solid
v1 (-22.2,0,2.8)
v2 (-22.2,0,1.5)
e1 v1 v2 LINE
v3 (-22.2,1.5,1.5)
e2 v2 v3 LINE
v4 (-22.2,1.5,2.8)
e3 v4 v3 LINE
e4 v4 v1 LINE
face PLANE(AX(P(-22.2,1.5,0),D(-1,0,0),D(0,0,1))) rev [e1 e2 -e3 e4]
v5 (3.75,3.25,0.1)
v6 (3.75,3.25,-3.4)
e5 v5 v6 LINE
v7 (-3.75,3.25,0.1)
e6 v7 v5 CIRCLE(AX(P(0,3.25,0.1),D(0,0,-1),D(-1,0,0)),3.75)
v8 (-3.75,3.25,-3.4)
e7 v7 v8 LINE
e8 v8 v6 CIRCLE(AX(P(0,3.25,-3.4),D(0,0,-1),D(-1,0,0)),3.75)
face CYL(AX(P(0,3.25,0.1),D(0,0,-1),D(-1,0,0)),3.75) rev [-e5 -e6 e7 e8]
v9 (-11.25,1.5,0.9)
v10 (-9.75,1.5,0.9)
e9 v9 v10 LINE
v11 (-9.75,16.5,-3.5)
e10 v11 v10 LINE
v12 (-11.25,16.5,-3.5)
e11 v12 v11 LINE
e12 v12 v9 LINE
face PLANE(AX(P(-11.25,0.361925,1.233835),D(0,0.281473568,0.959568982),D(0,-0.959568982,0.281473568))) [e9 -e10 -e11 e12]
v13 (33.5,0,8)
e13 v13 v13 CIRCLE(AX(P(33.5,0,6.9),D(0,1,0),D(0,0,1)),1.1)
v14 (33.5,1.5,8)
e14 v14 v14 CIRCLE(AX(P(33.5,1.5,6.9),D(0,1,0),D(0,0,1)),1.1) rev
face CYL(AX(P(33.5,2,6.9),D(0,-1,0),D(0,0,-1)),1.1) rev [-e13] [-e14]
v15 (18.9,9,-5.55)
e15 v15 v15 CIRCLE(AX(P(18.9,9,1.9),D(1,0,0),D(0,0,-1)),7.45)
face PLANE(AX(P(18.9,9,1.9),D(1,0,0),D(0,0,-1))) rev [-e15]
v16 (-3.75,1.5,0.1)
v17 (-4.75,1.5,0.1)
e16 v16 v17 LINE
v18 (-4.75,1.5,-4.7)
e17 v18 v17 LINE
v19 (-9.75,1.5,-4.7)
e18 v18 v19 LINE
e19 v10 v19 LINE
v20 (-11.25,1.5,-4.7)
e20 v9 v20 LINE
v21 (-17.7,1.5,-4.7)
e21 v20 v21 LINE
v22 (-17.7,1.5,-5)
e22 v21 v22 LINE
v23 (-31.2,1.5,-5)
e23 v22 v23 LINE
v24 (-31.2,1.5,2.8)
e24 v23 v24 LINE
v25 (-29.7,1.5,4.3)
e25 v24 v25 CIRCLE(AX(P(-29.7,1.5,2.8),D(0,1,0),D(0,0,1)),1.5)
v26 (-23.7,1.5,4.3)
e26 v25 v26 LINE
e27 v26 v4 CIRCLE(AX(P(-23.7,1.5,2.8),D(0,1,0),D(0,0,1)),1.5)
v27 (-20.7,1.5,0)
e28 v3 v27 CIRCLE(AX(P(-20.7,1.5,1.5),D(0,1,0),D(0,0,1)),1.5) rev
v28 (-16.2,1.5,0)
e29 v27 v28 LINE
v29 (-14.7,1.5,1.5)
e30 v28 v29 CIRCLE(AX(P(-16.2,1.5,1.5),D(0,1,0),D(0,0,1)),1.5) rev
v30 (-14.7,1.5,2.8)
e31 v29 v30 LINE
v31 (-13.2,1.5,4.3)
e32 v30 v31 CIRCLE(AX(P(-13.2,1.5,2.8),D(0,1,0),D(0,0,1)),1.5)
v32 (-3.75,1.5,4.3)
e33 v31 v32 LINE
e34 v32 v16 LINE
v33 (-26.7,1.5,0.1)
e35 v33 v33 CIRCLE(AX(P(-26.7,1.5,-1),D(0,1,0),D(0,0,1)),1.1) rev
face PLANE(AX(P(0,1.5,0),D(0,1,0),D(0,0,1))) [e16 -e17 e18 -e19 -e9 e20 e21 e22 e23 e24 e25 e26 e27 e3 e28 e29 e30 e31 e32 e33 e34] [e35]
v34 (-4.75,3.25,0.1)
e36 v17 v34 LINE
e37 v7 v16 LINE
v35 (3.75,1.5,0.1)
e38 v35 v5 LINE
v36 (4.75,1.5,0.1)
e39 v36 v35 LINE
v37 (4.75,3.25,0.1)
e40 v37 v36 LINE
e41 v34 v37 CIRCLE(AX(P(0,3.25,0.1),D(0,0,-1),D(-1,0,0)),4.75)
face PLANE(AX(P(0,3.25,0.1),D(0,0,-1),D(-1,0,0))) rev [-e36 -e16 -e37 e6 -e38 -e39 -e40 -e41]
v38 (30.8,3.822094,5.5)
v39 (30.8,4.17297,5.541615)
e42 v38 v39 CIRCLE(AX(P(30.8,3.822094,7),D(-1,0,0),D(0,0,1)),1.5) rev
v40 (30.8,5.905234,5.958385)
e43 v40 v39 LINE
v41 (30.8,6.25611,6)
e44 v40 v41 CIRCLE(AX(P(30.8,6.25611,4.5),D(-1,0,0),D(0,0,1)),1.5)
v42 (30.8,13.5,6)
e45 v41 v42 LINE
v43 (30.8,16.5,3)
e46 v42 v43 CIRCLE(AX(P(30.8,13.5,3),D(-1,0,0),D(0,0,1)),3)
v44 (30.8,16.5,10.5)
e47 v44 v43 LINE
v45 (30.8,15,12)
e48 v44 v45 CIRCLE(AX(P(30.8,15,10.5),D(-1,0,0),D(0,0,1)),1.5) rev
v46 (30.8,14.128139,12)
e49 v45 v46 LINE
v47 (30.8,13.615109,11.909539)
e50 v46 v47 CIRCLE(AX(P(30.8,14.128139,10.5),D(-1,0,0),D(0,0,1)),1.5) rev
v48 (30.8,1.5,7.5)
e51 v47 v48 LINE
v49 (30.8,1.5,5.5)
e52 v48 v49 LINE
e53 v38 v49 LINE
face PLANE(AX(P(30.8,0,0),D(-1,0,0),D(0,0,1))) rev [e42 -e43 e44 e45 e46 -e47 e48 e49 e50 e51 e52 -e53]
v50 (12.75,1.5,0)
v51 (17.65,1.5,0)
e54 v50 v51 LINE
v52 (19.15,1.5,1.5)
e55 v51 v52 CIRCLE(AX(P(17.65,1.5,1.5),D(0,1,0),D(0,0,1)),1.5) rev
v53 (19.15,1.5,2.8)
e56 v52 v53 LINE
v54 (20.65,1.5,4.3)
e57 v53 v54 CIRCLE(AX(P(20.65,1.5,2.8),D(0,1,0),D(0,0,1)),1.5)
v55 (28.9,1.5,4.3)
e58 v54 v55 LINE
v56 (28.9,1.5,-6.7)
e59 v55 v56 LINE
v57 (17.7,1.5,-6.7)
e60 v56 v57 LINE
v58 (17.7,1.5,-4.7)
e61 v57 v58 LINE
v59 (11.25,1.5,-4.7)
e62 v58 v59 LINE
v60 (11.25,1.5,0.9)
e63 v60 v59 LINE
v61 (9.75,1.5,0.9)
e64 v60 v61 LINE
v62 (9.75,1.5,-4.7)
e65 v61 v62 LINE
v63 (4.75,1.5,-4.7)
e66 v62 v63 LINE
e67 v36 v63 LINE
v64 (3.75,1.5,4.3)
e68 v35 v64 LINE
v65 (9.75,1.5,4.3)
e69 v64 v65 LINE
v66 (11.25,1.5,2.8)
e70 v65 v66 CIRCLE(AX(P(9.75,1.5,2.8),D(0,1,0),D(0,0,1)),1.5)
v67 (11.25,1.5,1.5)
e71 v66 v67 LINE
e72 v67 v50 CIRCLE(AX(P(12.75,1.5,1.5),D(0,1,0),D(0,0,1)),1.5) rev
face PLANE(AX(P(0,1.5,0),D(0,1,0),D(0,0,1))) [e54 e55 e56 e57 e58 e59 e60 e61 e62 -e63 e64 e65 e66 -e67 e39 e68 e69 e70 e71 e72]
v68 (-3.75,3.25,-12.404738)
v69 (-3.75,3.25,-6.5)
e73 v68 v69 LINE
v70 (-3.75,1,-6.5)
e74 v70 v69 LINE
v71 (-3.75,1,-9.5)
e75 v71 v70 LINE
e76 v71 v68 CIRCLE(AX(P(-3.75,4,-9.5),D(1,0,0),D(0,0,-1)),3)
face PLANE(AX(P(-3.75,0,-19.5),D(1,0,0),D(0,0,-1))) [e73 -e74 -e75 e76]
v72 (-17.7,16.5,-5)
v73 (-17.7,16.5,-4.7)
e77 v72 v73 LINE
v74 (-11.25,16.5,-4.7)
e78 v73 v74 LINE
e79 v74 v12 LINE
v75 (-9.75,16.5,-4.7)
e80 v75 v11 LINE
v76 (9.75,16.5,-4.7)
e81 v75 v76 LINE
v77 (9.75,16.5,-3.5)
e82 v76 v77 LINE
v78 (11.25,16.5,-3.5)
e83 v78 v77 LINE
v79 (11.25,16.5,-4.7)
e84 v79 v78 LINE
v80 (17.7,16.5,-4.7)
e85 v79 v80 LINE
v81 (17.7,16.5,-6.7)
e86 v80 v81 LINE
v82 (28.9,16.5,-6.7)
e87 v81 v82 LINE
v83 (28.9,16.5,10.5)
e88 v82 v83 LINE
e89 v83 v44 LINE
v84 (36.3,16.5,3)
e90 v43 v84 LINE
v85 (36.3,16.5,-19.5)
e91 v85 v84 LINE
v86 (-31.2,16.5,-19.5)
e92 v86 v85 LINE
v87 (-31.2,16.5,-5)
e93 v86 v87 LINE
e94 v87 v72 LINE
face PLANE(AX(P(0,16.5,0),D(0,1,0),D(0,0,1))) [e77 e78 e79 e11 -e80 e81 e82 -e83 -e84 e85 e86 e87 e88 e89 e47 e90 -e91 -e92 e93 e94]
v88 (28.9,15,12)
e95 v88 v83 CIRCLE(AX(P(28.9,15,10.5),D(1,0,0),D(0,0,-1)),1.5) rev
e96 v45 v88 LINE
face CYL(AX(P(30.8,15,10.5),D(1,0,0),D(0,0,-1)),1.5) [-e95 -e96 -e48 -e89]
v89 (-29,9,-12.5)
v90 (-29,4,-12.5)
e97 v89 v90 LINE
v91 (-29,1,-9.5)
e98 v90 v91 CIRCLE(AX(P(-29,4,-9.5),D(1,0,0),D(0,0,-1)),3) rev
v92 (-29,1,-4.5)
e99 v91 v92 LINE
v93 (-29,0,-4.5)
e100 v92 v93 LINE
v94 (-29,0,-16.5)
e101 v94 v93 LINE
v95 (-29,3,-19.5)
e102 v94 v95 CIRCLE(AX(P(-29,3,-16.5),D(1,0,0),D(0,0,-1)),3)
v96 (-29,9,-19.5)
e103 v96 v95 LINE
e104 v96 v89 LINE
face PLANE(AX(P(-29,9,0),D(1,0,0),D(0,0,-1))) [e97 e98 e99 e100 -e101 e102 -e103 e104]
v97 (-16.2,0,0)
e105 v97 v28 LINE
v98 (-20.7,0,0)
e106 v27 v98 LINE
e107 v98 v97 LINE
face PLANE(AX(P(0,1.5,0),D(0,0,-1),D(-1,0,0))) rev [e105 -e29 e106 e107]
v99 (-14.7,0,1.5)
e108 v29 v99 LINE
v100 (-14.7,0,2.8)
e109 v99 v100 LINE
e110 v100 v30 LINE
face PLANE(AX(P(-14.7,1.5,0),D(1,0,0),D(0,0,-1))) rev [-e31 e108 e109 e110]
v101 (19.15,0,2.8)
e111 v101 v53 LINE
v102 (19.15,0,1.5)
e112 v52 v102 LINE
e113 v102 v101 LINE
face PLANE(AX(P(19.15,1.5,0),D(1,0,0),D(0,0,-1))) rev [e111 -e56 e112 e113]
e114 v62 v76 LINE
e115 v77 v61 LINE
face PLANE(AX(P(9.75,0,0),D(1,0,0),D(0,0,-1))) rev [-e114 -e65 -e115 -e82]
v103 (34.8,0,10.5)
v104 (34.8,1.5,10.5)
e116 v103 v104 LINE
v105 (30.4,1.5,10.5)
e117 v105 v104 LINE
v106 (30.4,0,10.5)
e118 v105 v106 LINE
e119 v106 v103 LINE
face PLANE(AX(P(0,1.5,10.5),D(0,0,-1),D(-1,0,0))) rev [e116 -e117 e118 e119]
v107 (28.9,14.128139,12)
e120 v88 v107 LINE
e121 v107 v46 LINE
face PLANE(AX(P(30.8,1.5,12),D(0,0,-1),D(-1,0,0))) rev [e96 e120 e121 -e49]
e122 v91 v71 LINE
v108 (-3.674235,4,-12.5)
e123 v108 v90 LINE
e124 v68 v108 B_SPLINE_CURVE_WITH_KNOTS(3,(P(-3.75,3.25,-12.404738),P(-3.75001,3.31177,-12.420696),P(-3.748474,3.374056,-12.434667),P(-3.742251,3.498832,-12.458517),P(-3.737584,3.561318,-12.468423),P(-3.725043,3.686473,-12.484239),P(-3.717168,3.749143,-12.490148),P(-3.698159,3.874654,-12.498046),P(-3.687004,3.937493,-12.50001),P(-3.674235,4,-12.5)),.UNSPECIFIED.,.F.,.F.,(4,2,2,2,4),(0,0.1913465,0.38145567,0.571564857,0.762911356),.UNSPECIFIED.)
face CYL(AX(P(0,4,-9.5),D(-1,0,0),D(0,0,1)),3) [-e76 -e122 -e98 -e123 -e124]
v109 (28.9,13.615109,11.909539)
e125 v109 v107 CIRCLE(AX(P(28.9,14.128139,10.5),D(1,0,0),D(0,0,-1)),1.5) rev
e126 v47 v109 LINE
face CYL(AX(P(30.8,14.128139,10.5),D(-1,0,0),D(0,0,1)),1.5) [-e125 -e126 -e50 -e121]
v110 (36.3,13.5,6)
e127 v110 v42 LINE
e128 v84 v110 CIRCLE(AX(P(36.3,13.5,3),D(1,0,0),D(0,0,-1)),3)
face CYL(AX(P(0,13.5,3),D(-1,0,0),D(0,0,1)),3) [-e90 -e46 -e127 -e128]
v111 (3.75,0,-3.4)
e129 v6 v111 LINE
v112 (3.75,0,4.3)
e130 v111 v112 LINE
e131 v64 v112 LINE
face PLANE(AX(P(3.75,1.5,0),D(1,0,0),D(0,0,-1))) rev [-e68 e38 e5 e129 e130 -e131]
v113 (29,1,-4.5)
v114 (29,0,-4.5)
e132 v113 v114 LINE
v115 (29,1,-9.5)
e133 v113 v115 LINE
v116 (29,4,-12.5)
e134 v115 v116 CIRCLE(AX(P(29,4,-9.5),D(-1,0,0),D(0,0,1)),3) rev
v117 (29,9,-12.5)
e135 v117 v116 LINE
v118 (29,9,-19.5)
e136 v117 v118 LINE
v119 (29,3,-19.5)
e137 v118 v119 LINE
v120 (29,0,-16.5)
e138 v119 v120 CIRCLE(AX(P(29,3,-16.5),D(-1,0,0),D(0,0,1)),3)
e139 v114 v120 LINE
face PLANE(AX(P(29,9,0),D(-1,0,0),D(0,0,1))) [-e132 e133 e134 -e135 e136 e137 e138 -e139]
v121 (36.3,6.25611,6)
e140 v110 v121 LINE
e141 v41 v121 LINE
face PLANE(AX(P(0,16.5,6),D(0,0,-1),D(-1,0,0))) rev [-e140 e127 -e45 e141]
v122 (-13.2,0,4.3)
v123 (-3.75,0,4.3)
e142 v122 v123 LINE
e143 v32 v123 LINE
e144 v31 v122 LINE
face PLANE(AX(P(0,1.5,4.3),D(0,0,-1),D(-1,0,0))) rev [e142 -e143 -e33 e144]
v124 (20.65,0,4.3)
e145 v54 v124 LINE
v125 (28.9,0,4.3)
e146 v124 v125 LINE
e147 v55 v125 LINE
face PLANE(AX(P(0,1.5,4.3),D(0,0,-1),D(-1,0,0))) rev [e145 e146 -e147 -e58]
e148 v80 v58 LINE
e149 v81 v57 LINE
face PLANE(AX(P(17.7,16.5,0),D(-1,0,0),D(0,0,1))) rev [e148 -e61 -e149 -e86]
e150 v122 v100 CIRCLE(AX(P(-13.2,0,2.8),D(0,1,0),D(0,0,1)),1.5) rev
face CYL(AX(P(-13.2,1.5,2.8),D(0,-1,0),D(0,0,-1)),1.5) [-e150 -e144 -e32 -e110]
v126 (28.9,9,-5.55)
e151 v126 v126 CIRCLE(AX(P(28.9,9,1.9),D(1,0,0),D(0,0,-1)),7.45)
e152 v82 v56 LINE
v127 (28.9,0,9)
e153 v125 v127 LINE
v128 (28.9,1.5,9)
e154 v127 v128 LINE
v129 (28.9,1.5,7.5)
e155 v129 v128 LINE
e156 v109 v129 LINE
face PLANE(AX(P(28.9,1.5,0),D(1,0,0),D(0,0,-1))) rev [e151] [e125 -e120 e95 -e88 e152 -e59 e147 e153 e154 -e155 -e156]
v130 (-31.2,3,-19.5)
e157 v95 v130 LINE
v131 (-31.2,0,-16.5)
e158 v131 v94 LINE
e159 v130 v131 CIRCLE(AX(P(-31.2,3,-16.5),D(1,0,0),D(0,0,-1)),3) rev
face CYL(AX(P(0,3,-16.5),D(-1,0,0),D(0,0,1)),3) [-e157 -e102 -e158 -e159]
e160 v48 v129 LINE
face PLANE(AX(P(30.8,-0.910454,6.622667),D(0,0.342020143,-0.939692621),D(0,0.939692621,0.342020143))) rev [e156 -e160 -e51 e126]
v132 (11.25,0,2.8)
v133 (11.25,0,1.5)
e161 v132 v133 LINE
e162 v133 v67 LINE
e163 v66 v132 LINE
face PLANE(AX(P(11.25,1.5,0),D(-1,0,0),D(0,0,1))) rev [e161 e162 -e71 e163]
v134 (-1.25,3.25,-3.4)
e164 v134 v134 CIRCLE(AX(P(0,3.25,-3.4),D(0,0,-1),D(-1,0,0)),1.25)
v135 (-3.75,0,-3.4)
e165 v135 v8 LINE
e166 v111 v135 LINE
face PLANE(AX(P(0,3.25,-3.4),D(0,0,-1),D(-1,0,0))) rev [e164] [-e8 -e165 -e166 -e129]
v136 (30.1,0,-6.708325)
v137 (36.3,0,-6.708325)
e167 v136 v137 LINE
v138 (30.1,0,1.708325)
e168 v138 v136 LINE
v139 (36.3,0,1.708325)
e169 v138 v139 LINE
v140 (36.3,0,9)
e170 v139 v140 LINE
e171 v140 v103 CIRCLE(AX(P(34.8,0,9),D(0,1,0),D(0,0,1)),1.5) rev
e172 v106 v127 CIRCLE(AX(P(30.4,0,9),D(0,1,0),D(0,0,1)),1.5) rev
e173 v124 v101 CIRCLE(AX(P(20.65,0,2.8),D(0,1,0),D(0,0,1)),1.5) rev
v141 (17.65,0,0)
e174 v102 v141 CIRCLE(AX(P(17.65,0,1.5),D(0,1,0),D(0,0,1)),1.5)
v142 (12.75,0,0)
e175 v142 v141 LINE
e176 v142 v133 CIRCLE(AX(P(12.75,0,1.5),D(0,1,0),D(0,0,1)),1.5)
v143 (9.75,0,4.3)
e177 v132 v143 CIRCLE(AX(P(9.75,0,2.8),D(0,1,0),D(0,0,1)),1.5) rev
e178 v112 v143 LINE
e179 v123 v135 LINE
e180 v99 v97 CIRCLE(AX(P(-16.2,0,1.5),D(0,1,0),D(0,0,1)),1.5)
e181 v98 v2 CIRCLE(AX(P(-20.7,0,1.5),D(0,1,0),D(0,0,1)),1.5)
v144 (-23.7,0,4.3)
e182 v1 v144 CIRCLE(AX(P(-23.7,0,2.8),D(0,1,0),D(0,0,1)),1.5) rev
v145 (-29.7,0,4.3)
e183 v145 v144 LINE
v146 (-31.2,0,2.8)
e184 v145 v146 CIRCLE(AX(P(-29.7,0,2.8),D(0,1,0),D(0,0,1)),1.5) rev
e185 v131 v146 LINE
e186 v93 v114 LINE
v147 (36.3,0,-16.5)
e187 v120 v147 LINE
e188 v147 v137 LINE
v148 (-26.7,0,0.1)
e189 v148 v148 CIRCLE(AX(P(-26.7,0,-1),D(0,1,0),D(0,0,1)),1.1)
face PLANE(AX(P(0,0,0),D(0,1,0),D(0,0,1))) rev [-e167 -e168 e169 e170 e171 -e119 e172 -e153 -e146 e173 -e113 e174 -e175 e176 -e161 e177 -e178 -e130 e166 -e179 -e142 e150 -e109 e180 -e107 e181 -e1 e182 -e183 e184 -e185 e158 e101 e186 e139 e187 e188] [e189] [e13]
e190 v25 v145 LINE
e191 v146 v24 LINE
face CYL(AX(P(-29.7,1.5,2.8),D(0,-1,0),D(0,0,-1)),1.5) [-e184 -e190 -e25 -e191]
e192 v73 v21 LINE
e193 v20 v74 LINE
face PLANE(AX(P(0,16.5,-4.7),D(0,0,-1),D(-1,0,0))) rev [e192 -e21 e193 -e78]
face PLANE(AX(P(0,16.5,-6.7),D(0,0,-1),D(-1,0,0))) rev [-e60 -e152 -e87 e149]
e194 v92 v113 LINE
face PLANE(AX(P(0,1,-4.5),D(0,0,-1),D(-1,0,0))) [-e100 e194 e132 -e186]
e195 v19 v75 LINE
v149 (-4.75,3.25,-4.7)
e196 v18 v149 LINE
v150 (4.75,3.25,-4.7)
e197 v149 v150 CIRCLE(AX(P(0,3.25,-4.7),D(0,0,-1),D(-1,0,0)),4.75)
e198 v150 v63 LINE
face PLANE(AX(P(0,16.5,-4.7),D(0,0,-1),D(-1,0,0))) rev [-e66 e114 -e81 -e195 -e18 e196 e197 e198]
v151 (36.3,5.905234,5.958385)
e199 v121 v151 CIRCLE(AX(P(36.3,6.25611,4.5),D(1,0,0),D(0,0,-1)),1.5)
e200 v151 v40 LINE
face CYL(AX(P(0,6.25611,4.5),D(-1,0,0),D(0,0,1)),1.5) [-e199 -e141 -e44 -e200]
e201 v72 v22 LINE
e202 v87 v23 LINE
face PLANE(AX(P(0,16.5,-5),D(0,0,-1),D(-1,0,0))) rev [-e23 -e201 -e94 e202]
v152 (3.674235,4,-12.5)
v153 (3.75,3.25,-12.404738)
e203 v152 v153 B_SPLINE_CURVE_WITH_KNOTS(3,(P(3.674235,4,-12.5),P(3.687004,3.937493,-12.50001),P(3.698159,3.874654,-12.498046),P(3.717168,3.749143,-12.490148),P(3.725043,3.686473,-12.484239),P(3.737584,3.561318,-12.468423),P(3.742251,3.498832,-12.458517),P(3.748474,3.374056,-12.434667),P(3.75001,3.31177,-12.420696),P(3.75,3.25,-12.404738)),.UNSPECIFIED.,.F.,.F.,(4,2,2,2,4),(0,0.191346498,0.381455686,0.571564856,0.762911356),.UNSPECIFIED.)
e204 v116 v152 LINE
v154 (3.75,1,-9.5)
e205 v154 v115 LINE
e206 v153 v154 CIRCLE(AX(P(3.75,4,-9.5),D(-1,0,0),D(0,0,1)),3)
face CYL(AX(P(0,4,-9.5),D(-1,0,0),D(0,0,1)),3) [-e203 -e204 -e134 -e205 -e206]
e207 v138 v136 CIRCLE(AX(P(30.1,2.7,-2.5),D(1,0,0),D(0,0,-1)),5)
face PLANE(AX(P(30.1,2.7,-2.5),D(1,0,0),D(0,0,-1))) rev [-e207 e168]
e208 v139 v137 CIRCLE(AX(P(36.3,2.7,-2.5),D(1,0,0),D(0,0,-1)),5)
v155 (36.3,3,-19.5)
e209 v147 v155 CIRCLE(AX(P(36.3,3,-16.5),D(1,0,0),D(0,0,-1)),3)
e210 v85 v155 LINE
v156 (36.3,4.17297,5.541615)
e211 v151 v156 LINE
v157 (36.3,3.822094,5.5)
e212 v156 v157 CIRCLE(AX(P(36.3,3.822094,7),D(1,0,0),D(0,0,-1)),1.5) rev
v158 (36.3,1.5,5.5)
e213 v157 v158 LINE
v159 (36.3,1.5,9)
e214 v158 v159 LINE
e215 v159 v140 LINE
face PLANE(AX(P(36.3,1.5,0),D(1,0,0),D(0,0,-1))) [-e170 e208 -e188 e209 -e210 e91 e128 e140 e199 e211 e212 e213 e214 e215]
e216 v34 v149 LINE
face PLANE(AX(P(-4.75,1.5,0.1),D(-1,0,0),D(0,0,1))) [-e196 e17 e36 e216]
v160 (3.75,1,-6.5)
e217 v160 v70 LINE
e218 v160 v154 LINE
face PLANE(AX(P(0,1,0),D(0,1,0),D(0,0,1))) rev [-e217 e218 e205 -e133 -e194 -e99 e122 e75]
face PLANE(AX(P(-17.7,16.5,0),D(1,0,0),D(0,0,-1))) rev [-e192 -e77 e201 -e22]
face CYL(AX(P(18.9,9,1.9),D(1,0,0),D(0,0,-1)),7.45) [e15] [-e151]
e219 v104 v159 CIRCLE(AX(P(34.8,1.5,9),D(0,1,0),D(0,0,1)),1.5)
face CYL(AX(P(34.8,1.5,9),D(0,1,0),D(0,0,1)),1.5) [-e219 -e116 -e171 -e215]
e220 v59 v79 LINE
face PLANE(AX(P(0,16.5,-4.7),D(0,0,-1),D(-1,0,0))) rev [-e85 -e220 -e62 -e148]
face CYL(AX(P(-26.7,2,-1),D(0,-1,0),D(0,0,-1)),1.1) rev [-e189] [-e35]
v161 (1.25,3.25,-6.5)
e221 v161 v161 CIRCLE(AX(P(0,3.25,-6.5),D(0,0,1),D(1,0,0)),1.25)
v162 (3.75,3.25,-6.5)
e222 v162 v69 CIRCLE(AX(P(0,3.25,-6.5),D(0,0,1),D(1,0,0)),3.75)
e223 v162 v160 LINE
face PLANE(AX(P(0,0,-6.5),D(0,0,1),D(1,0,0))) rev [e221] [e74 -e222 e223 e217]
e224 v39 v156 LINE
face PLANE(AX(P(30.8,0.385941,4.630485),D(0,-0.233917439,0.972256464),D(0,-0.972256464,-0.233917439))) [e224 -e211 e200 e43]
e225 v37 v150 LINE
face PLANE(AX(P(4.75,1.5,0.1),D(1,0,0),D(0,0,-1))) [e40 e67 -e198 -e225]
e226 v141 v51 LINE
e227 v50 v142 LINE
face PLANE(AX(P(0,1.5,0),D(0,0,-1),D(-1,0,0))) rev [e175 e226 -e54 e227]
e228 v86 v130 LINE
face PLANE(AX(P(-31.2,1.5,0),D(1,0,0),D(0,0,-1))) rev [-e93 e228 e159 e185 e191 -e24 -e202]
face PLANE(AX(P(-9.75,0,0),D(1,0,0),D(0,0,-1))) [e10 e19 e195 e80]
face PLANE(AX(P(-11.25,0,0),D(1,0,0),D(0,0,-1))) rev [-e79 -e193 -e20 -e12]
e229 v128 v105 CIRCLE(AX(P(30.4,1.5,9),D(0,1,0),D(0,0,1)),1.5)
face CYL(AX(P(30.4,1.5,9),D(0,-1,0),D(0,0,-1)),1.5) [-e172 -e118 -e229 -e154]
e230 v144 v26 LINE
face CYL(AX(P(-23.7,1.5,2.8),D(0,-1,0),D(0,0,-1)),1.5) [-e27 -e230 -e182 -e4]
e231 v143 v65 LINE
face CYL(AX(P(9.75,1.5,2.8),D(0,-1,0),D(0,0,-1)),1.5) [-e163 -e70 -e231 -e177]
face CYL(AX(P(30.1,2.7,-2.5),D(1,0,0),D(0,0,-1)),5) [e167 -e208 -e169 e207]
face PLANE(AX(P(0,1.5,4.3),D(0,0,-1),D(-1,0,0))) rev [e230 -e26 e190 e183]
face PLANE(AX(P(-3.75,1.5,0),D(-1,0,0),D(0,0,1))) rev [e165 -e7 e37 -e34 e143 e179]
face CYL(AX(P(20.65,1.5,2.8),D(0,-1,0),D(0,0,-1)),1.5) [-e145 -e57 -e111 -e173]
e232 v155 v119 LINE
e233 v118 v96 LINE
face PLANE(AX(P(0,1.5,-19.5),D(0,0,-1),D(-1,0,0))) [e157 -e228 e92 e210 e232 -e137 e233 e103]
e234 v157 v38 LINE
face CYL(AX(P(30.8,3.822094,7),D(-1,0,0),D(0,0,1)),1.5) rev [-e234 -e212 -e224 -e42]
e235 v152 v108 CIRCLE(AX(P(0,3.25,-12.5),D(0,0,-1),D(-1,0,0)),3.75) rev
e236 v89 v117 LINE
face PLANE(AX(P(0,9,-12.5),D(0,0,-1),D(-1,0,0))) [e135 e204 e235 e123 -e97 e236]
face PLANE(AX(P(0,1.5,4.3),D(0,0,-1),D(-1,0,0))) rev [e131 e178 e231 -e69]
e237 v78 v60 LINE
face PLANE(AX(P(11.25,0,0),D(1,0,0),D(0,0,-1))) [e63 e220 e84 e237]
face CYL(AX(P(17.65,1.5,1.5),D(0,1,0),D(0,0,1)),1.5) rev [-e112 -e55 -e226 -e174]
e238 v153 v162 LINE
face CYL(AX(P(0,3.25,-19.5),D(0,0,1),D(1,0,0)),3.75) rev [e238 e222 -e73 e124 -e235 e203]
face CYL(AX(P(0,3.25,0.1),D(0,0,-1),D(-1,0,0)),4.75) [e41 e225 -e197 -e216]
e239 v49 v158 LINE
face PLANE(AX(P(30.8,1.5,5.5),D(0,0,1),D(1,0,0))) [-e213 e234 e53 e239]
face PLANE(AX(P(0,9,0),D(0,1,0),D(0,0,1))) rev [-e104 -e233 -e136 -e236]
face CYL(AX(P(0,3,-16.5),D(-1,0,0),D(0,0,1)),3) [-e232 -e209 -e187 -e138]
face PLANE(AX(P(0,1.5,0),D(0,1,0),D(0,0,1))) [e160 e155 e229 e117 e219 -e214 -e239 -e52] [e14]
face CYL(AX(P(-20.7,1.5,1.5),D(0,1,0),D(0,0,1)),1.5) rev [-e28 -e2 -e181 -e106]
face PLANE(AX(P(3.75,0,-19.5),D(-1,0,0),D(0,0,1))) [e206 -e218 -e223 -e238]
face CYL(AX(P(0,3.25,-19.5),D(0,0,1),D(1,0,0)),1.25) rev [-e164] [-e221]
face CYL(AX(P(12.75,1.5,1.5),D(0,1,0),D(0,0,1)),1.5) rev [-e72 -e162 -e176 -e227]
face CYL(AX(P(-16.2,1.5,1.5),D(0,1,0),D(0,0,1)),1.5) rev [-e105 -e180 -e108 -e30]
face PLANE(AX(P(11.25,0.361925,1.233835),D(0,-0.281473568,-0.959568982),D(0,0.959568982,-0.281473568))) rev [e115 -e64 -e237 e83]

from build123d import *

# Parameters (mm, degrees)
EXTRUDE_1_DEPTH          = 1.5
EXTRUDE_2_DEPTH          = 16.5
EXTRUDE_START            = 36.3
EXTRUDE_3_DEPTH          = 6.2
EXTRUDE_START_2          = 28.9
EXTRUDE_4_DEPTH          = 1.9
CUT_EXTRUDE_START        = 36.3
CUT_EXTRUDE_1_DEPTH      = 5.5
SKETCH_3_6_R             = 7.45
EXTRUDE_7_DEPTH          = 10
FILLET_1_R               = 1.5
FILLET_2_R               = 1.5
FILLET_3_R               = 1.5
FILLET_4_R               = 3
EXTRUDE_START_3          = -4.7
EXTRUDE_5_DEPTH          = 4.8
CUT_EXTRUDE_START_2      = -3.4
CUT_EXTRUDE_2_OUTLINE_W  = 7.5
CUT_EXTRUDE_2_OUTLINE_H  = 1.5
CUT_EXTRUDE_2_DEPTH      = 0.5
EXTRUDE_6_DEPTH          = 1.3
CUT_EXTRUDE_START_3      = -19.5
CUT_EXTRUDE_3_DEPTH      = 13
CUT_EXTRUDE_4_DEPTH      = 44.001744151
CUT_EXTRUDE_4_DEPTH_BACK = 44.001744151
SKETCH_5_R               = 1.25
EXTRUDE_START_4          = 9.75
EXTRUDE_8_DEPTH          = 1.5
EXTRUDE_START_5          = -9.75
EXTRUDE_9_DEPTH          = 1.5
SKETCH_7_W               = 29
SKETCH_7_H               = 7
CUT_EXTRUDE_5_DEPTH      = 9
SKETCH_7_3_W             = 29
SKETCH_7_3_H             = 8
CUT_EXTRUDE_6_DEPTH      = 1
FILLET_5_R               = 3
FILLET_6_R               = 3
SKETCH_1_4_R             = 1.1
CUT_EXTRUDE_7_DEPTH      = 2


# Read off the part's stored shape, not the designer's step: Бобышка-Вытянуть5, Вырез-Вытянуть2, Бобышка-Вытянуть6, Вырез-Вытянуть3
with BuildPart() as part:
    # Эскиз1 → Бобышка-Вытянуть1 (new body)
    with BuildSketch(Plane(origin=(0, 0, 0), x_dir=(1, 0, 0), z_dir=(0, 1, 0))):
        Polygon((36.3, 19.5), (-31.2, 19.5), (-31.2, -4.3), (-22.2, -4.3), (-22.2, 0), (-14.7, 0), (-14.7, -4.3), (-3.75, -4.3), (-3.75, 2.9), (3.75, 2.9), (3.75, -4.3), (11.25, -4.3), (11.25, 0), (19.15, 0), (19.15, -4.3), (28.9, -4.3), (28.9, -10.5), (36.3, -10.5), align=None)
    extrude(amount=EXTRUDE_1_DEPTH)

    # Эскиз1<3> → Бобышка-Вытянуть2 (add)
    with BuildSketch(Plane(origin=(0, 0, 0), x_dir=(1, 0, 0), z_dir=(0, 1, 0))):
        Polygon((36.3, 19.5), (-31.2, 19.5), (-31.2, 5), (-17.7, 5), (-17.7, 4.7), (17.7, 4.7), (17.7, 6.7), (28.9, 6.7), (28.9, -6), (36.3, -6), align=None)
    extrude(amount=EXTRUDE_2_DEPTH)

    # Эскиз3 → Бобышка-Вытянуть3 (add)
    with BuildSketch(Plane(origin=(0, 0, 0), x_dir=(0, 0, -1), z_dir=(1, 0, 0)).offset(EXTRUDE_START)):
        with BuildLine():
            Line((0, 1.5), (0, 0))
            Line((0, 0), (6.708325083, 0))
            ThreePointArc((6.708325083, 0), (7.092746426, 0.723467616), (7.35386444, 1.5))
            Line((7.35386444, 1.5), (0, 1.5))
        make_face()
        with BuildLine():
            Line((6.708325083, 0), (0, 0))
            Line((0, 0), (0, 1.5))
            Line((0, 1.5), (-2.35386444, 1.5))
            ThreePointArc((-2.35386444, 1.5), (1.683495092, -2.232881484), (6.708325083, 0))
        make_face()
    extrude(amount=-EXTRUDE_3_DEPTH)

    # Эскиз3<4> → Бобышка-Вытянуть4 (add)
    with BuildSketch(Plane(origin=(0, 0, 0), x_dir=(0, 0, -1), z_dir=(1, 0, 0)).offset(EXTRUDE_START_2)):
        Polygon((-7.5, 1.5), (-6, 1.5), (-6, 16.5), (-12, 16.5), (-12, 13.863648388), align=None)
    extrude(amount=EXTRUDE_4_DEPTH)

    # Эскиз3<5> → Вырез-Вытянуть1 (cut)
    with BuildSketch(Plane(origin=(0, 0, 0), x_dir=(0, 0, -1), z_dir=(1, 0, 0)).offset(CUT_EXTRUDE_START)):
        Polygon((-6, 1.5), (-5.5, 1.5), (-5.5, 4), (-6, 6.078204319), align=None)
    extrude(amount=-CUT_EXTRUDE_1_DEPTH, mode=Mode.SUBTRACT)

    # Эскиз3<6> → Бобышка-Вытянуть7 (add)
    with BuildSketch(Plane(origin=(0, 0, 0), x_dir=(0, 0, -1), z_dir=(1, 0, 0)).offset(EXTRUDE_START_2)):
        with Locations((-1.9, 9)):
            Circle(SKETCH_3_6_R)
    extrude(amount=-EXTRUDE_7_DEPTH)

    # Скругление1
    fillet_1_edges = [part.edges().sort_by_distance(p)[0] for p in [
        (36.3, 0.75, 10.5),
        (28.9, 0.75, 10.5),
        (19.15, 0.75, 4.3),
        (19.15, 0.75, 0),
        (11.25, 0.75, 0),
        (11.25, 0.75, 4.3),
        (-14.7, 0.75, 4.3),
        (-14.7, 0.75, 0),
        (-22.2, 0.75, 0),
        (-22.2, 0.75, 4.3),
        (-31.2, 0.75, 4.3),
    ]]
    fillet(fillet_1_edges, radius=FILLET_1_R)

    # Скругление2
    fillet_2_edges = [part.edges().sort_by_distance(p)[0] for p in [
        (29.85, 16.5, 12),
        (29.85, 13.863648388, 12),
    ]]
    fillet(fillet_2_edges, radius=FILLET_2_R)

    # Скругление3
    fillet_3_edges = [part.edges().sort_by_distance(p)[0] for p in [
        (33.55, 6.078204319, 6),
        (33.55, 4, 5.5),
    ]]
    fillet(fillet_3_edges, radius=FILLET_3_R)

    # Скругление4
    fillet_4_edges = [part.edges().sort_by_distance(p)[0] for p in [
        (33.55, 16.5, 6),
    ]]
    fillet(fillet_4_edges, radius=FILLET_4_R)

    # Бобышка-Вытянуть5 outline → Бобышка-Вытянуть5 (add)
    with BuildSketch(Plane.XY.offset(EXTRUDE_START_3)):
        with BuildLine():
            Line((-3.75, 1.5), (-3.75, 3.25))
            ThreePointArc((-3.75, 3.25), (0, 7), (3.75, 3.25))
            Line((3.75, 3.25), (3.75, 1.5))
            Line((3.75, 1.5), (4.75, 1.5))
            Line((4.75, 1.5), (4.75, 3.25))
            ThreePointArc((4.75, 3.25), (0, 8), (-4.75, 3.25))
            Line((-4.75, 3.25), (-4.75, 1.5))
            Line((-4.75, 1.5), (-3.75, 1.5))
        make_face()
    extrude(amount=EXTRUDE_5_DEPTH)

    # Вырез-Вытянуть2 outline → Вырез-Вытянуть2 (cut)
    with BuildSketch(Plane.XY.offset(CUT_EXTRUDE_START_2)):
        with Locations((0, 0.75)):
            Rectangle(CUT_EXTRUDE_2_OUTLINE_W, CUT_EXTRUDE_2_OUTLINE_H)
    extrude(amount=CUT_EXTRUDE_2_DEPTH, mode=Mode.SUBTRACT)

    # Бобышка-Вытянуть6 outline → Бобышка-Вытянуть6 (add)
    with BuildSketch(Plane.XY.offset(EXTRUDE_START_3)):
        with BuildLine():
            Line((-3.75, 1.5), (3.75, 1.5))
            Line((3.75, 1.5), (3.75, 3.25))
            ThreePointArc((3.75, 3.25), (0, 7), (-3.75, 3.25))
            Line((-3.75, 3.25), (-3.75, 1.5))
        make_face()
    extrude(amount=EXTRUDE_6_DEPTH)

    # Вырез-Вытянуть3 outline → Вырез-Вытянуть3 (cut)
    with BuildSketch(Plane.XY.offset(CUT_EXTRUDE_START_3)):
        with BuildLine():
            Line((-3.75, 3.25), (-3.75, 0))
            Line((-3.75, 0), (3.75, 0))
            Line((3.75, 0), (3.75, 3.25))
            ThreePointArc((3.75, 3.25), (0, 7), (-3.75, 3.25))
        make_face()
    extrude(amount=CUT_EXTRUDE_3_DEPTH, mode=Mode.SUBTRACT)

    # Эскиз5 → Вырез-Вытянуть4 (cut, two sides: drawn at the far end of the back side and taken through both)
    with BuildSketch(Plane.XY.offset(-3.4).offset(-CUT_EXTRUDE_4_DEPTH_BACK)):
        with Locations((0, 3.25)):
            Circle(SKETCH_5_R)
    extrude(amount=CUT_EXTRUDE_4_DEPTH + CUT_EXTRUDE_4_DEPTH_BACK, mode=Mode.SUBTRACT)

    # Эскиз6 → Бобышка-Вытянуть8 (add)
    with BuildSketch(Plane(origin=(0, 0, 0), x_dir=(0, 0, -1), z_dir=(1, 0, 0)).offset(EXTRUDE_START_4)):
        Polygon((4.7, 1.5), (4.7, 16.5), (3.5, 16.5), (-0.9, 1.5), align=None)
    extrude(amount=EXTRUDE_8_DEPTH)

    # Эскиз6<4> → Бобышка-Вытянуть9 (add)
    with BuildSketch(Plane(origin=(0, 0, 0), x_dir=(0, 0, -1), z_dir=(1, 0, 0)).offset(EXTRUDE_START_5)):
        Polygon((4.7, 1.5), (4.7, 16.5), (3.5, 16.5), (-0.9, 1.5), align=None)
    extrude(amount=-EXTRUDE_9_DEPTH)

    # Эскиз7 → Вырез-Вытянуть5 (cut)
    with BuildSketch(Plane(origin=(0, 0, 0), x_dir=(1, 0, 0), z_dir=(0, 1, 0))):
        with Locations((14.5, 16)):
            Rectangle(SKETCH_7_W, SKETCH_7_H)
        with Locations((-14.5, 16)):
            Rectangle(SKETCH_7_W, SKETCH_7_H)
    extrude(amount=CUT_EXTRUDE_5_DEPTH, mode=Mode.SUBTRACT)

    # Эскиз7<3> → Вырез-Вытянуть6 (cut)
    with BuildSketch(Plane(origin=(0, 0, 0), x_dir=(1, 0, 0), z_dir=(0, 1, 0))):
        with Locations((14.5, 8.5)):
            Rectangle(SKETCH_7_3_W, SKETCH_7_3_H)
        with Locations((-14.5, 8.5)):
            Rectangle(SKETCH_7_3_W, SKETCH_7_3_H)
    extrude(amount=CUT_EXTRUDE_6_DEPTH, mode=Mode.SUBTRACT)

    # Скругление5
    fillet_5_edges = [part.edges().sort_by_distance(p)[0] for p in [
        (-16.375, 1, -12.5),
        (16.375, 1, -12.5),
    ]]
    fillet(fillet_5_edges, radius=FILLET_5_R)

    # Скругление6
    fillet_6_edges = [part.edges().sort_by_distance(p)[0] for p in [
        (-30.1, 0, -19.5),
        (32.65, 0, -19.5),
    ]]
    fillet(fillet_6_edges, radius=FILLET_6_R)

    # Эскиз1<4> → Вырез-Вытянуть7 (cut)
    with BuildSketch(Plane(origin=(0, 0, 0), x_dir=(1, 0, 0), z_dir=(0, 1, 0))):
        with Locations(Location((-26.7, 1, 0), (0, 0, 270))):
            Circle(SKETCH_1_4_R)
        with Locations(Location((33.5, -6.9, 0), (0, 0, 270))):
            Circle(SKETCH_1_4_R)
    extrude(amount=CUT_EXTRUDE_7_DEPTH, mode=Mode.SUBTRACT)


solid = part.part
